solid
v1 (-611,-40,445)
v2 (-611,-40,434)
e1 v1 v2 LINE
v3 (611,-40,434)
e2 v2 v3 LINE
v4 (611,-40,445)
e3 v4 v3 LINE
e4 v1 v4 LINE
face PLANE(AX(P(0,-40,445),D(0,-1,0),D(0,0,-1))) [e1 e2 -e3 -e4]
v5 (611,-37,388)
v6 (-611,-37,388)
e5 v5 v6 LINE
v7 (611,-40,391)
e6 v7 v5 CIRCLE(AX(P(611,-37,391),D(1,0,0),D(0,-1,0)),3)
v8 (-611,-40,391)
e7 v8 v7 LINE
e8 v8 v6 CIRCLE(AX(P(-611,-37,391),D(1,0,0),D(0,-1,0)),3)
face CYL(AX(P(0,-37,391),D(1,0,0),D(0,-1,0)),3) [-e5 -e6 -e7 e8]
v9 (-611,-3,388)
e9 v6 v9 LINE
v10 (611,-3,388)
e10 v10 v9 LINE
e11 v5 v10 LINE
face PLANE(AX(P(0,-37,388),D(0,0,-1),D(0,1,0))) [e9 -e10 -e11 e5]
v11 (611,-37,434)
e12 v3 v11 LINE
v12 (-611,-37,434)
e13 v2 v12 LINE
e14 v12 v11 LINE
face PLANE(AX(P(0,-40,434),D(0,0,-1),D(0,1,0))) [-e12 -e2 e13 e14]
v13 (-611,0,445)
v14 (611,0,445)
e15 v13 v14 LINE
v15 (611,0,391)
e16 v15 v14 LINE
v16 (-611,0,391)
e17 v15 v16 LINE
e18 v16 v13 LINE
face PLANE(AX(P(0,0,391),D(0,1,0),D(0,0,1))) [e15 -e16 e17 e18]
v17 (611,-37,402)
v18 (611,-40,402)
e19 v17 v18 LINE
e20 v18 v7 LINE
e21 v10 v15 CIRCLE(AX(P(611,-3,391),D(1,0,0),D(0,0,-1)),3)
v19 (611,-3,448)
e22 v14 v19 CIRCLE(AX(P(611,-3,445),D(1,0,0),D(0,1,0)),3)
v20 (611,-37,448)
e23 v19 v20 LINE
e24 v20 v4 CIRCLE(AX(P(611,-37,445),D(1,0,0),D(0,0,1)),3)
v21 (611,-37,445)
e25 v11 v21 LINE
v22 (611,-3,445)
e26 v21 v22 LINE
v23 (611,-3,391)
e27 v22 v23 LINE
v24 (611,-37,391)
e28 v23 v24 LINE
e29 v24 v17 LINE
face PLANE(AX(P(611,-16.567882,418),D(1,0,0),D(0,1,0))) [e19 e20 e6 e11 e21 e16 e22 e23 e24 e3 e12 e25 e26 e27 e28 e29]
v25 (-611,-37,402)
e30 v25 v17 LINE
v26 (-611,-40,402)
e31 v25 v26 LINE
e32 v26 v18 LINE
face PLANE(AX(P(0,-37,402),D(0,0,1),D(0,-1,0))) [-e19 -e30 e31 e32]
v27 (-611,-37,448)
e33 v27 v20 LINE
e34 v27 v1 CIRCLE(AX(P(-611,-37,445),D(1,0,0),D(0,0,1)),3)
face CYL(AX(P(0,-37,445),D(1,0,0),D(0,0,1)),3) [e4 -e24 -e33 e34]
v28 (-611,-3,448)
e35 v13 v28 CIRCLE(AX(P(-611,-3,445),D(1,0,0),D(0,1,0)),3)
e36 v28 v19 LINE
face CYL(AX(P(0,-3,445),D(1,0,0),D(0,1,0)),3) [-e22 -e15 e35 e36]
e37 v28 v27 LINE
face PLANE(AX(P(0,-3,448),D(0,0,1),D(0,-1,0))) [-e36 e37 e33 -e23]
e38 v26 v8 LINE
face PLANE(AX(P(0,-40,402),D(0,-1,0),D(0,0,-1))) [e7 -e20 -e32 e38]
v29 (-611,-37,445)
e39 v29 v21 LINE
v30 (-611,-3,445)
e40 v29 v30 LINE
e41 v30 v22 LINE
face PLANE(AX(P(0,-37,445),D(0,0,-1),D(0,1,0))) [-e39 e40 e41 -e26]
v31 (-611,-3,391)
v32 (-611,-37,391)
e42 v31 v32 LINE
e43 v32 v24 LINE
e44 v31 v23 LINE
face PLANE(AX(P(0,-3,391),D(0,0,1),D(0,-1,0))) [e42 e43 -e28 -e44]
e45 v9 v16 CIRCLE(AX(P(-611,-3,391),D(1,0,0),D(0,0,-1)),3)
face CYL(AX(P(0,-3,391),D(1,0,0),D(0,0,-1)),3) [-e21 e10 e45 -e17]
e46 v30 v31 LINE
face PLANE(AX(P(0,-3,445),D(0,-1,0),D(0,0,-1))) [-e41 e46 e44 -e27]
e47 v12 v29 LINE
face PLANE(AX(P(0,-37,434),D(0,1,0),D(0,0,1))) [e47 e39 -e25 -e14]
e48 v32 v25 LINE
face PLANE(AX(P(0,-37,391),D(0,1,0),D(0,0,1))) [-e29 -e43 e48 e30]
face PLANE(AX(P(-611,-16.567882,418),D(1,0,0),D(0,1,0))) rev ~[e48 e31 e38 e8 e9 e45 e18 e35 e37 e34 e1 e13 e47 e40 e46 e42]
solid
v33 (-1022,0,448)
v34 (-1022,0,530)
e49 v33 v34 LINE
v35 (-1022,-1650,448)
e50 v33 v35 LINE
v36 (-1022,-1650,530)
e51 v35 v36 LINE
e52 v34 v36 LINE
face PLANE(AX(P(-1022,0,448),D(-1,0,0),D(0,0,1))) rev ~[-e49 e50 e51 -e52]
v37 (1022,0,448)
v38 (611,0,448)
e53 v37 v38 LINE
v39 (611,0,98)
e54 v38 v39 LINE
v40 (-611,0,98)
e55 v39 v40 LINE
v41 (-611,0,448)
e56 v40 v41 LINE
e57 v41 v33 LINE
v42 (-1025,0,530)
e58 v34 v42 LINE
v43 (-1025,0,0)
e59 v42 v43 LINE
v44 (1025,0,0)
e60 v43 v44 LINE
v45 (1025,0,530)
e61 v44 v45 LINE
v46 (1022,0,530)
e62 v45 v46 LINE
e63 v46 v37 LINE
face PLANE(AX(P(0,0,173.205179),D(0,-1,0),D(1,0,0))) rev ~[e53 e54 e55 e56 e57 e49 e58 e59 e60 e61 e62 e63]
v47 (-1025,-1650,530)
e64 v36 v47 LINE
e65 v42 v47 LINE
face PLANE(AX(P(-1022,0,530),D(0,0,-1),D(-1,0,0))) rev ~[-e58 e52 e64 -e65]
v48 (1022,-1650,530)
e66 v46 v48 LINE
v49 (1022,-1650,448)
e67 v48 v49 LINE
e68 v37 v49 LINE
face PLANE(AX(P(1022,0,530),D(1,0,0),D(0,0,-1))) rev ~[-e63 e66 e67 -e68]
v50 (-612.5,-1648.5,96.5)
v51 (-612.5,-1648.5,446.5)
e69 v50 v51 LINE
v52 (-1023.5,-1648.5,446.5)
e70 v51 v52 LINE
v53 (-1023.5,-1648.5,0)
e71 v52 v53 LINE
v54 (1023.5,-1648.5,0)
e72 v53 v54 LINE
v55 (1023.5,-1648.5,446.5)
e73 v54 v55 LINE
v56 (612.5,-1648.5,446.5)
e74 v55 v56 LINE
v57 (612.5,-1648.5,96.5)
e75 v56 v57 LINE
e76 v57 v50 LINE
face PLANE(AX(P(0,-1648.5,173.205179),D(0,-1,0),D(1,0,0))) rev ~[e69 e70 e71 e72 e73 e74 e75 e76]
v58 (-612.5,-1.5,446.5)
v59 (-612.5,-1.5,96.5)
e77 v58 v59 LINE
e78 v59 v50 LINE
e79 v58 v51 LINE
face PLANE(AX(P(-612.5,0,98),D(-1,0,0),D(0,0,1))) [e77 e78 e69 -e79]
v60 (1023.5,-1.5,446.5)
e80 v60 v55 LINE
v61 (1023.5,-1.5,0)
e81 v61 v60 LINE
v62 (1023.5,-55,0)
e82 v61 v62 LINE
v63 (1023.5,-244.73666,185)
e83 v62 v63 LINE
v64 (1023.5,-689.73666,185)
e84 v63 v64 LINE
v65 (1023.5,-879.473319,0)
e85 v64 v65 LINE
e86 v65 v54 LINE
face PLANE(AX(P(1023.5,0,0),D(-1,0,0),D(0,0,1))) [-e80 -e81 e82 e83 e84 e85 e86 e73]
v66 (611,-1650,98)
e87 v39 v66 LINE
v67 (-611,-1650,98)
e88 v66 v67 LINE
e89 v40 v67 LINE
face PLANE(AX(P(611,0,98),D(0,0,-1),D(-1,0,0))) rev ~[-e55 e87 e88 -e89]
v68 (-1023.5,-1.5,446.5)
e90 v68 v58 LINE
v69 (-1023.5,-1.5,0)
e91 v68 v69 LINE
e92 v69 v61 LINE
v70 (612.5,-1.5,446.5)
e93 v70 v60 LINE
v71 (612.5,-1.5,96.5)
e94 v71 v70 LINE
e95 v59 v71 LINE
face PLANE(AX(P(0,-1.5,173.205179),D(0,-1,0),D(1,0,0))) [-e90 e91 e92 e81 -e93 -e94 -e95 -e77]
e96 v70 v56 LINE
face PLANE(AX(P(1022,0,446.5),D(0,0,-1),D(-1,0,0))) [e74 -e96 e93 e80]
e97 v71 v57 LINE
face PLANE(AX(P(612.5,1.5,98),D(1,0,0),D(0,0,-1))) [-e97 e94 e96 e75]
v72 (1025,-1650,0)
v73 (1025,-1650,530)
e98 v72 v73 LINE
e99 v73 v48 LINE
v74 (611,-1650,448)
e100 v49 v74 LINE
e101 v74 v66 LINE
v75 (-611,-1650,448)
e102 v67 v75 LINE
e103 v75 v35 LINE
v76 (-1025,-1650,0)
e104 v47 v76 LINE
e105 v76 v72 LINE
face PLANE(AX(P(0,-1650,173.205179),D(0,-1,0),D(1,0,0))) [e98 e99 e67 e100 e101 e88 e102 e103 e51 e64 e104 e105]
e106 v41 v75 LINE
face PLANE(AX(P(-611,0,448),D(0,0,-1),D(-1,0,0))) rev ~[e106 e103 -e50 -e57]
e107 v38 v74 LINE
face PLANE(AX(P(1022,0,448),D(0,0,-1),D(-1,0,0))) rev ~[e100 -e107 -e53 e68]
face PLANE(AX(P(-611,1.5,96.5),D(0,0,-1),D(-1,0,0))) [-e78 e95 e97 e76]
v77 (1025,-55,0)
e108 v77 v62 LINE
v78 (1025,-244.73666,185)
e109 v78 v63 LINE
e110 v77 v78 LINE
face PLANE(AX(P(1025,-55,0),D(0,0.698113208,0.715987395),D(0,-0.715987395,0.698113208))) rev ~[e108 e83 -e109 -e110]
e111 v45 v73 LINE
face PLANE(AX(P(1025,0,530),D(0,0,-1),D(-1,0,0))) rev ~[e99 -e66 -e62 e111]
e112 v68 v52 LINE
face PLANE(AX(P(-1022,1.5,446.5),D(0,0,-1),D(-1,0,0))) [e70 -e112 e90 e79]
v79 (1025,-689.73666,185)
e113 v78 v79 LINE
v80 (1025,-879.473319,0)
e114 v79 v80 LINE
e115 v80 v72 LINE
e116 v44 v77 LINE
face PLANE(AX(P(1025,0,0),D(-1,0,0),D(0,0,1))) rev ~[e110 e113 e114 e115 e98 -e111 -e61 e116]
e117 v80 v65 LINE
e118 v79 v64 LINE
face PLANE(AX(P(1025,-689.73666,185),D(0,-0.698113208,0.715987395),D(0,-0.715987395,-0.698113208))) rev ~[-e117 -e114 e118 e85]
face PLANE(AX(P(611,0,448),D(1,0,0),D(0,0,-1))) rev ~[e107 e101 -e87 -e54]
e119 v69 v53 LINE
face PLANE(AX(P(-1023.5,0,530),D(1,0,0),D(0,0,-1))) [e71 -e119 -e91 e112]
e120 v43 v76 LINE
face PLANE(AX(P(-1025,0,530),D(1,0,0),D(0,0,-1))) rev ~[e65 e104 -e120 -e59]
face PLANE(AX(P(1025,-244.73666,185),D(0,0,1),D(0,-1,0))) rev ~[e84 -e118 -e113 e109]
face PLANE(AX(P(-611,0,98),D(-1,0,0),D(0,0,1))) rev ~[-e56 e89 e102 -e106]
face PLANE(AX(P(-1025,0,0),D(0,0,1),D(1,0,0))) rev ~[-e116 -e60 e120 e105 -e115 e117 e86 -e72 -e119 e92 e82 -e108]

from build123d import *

# Parameters (mm, degrees)
F1_DEPTH      = 1650
F2_T          = 1.5
F2_T3_DEPTH   = 1653
F4_DEPTH      = 611
F4_DEPTH_BACK = 611
F8_DEPTH      = 1.5


# Not quite as in the source:
# - a shell that OpenCascade refuses in one call is made with other operations: the cavity is built on its own and cut out
# - the program builds the solid bodies; features that only make, move or delete a surface that nothing else refers to are left out


with BuildPart() as f1:
    # F0 (on Front) → F1 (new body)
    with BuildSketch(Plane.XZ):
        Polygon((-1025, 0), (1025, 0), (1025, 530), (1022, 530), (1022, 448), (611, 448), (611, 98), (-611, 98), (-611, 448), (-1022, 448), (-1022, 530), (-1025, 530), align=None)
    extrude(amount=F1_DEPTH)

    # F2: shell of thickness 1.5, made by hand


with BuildPart() as f2_core1:
    # F2_t2: copy of F1
    add(f1.part)

    # the walls: a layer under each face that stays
    f2_faces = [f2_core1.faces().sort_by_distance(p)[0] for p in [
        (1025, -825, 265),
        (1023.5, -825, 530),
        (1022, -825, 489),
        (816.5, -825, 448),
        (611, -825, 273),
        (0, -825, 98),
        (-611, -825, 273),
        (-816.5, -825, 448),
        (-1022, -825, 489),
        (-1023.5, -825, 530),
        (-1025, -825, 265),
        (-683.3333333333, 0, 88.3333333333),
        (-683.3333333333, -1650, 88.3333333333),
    ]]
    thicken(f2_faces, amount=-F2_T, mode=Mode.SUBTRACT)

    # F2_s4 → F2_t3 (cut)
    with BuildSketch(Plane.XZ.offset(-1.5)):
        Polygon((1021.985, 448.015), (1023.5, 448), (1023.5, 446.5), (1022, 446.5), align=None)
        Polygon((610.985, 98.015), (612.5, 98), (612.5, 96.5), (611, 96.5), align=None)
        Polygon((-610.985, 98.015), (-611, 96.5), (-612.5, 96.5), (-612.5, 98), align=None)
        Polygon((-1021.985, 448.015), (-1022, 446.5), (-1023.5, 446.5), (-1023.5, 448), align=None)
    extrude(amount=F2_T3_DEPTH, mode=Mode.SUBTRACT)


with BuildPart() as f1_1:
    add(f1.part)

    # what is left inside the walls is the cavity
    f2_cavity = [f2_core1.part.solids().sort_by_distance(p)[0] for p in [
        (0, -1099.5, 0.015),
    ]]
    add(f2_cavity, mode=Mode.SUBTRACT)

    # F7 (on face) → F8 (cut, through all)
    with BuildSketch(Plane.YZ.offset(1025)):
        Polygon((-879.4733192202, 0), (-55, 0), (-244.7366596101, 185), (-689.7366596101, 185), align=None)
    extrude(amount=-F8_DEPTH, mode=Mode.SUBTRACT)


with BuildPart() as f4:
    # F3 (on Right) → F4 (new body, two sides)
    with BuildSketch(Plane.YZ) as f4_sk:
        with BuildLine():
            Line((0, 391), (0, 445))
            ThreePointArc((0, 445), (-0.8786796564, 447.1213203436), (-3, 448))
            Line((-3, 448), (-37, 448))
            ThreePointArc((-37, 448), (-39.1213203436, 447.1213203436), (-40, 445))
            Line((-40, 445), (-40, 434))
            Line((-40, 434), (-37, 434))
            Line((-37, 434), (-37, 445))
            Line((-37, 445), (-3, 445))
            Line((-3, 445), (-3, 391))
            Line((-3, 391), (-37, 391))
            Line((-37, 391), (-37, 402))
            Line((-37, 402), (-40, 402))
            Line((-40, 402), (-40, 391))
            ThreePointArc((-40, 391), (-39.1213203436, 388.8786796564), (-37, 388))
            Line((-37, 388), (-3, 388))
            ThreePointArc((-3, 388), (-0.8786796564, 388.8786796564), (0, 391))
        make_face()
    extrude(amount=F4_DEPTH)
    extrude(f4_sk.sketch, amount=-F4_DEPTH_BACK)


solid = Compound([f1_1.part, f4.part])
